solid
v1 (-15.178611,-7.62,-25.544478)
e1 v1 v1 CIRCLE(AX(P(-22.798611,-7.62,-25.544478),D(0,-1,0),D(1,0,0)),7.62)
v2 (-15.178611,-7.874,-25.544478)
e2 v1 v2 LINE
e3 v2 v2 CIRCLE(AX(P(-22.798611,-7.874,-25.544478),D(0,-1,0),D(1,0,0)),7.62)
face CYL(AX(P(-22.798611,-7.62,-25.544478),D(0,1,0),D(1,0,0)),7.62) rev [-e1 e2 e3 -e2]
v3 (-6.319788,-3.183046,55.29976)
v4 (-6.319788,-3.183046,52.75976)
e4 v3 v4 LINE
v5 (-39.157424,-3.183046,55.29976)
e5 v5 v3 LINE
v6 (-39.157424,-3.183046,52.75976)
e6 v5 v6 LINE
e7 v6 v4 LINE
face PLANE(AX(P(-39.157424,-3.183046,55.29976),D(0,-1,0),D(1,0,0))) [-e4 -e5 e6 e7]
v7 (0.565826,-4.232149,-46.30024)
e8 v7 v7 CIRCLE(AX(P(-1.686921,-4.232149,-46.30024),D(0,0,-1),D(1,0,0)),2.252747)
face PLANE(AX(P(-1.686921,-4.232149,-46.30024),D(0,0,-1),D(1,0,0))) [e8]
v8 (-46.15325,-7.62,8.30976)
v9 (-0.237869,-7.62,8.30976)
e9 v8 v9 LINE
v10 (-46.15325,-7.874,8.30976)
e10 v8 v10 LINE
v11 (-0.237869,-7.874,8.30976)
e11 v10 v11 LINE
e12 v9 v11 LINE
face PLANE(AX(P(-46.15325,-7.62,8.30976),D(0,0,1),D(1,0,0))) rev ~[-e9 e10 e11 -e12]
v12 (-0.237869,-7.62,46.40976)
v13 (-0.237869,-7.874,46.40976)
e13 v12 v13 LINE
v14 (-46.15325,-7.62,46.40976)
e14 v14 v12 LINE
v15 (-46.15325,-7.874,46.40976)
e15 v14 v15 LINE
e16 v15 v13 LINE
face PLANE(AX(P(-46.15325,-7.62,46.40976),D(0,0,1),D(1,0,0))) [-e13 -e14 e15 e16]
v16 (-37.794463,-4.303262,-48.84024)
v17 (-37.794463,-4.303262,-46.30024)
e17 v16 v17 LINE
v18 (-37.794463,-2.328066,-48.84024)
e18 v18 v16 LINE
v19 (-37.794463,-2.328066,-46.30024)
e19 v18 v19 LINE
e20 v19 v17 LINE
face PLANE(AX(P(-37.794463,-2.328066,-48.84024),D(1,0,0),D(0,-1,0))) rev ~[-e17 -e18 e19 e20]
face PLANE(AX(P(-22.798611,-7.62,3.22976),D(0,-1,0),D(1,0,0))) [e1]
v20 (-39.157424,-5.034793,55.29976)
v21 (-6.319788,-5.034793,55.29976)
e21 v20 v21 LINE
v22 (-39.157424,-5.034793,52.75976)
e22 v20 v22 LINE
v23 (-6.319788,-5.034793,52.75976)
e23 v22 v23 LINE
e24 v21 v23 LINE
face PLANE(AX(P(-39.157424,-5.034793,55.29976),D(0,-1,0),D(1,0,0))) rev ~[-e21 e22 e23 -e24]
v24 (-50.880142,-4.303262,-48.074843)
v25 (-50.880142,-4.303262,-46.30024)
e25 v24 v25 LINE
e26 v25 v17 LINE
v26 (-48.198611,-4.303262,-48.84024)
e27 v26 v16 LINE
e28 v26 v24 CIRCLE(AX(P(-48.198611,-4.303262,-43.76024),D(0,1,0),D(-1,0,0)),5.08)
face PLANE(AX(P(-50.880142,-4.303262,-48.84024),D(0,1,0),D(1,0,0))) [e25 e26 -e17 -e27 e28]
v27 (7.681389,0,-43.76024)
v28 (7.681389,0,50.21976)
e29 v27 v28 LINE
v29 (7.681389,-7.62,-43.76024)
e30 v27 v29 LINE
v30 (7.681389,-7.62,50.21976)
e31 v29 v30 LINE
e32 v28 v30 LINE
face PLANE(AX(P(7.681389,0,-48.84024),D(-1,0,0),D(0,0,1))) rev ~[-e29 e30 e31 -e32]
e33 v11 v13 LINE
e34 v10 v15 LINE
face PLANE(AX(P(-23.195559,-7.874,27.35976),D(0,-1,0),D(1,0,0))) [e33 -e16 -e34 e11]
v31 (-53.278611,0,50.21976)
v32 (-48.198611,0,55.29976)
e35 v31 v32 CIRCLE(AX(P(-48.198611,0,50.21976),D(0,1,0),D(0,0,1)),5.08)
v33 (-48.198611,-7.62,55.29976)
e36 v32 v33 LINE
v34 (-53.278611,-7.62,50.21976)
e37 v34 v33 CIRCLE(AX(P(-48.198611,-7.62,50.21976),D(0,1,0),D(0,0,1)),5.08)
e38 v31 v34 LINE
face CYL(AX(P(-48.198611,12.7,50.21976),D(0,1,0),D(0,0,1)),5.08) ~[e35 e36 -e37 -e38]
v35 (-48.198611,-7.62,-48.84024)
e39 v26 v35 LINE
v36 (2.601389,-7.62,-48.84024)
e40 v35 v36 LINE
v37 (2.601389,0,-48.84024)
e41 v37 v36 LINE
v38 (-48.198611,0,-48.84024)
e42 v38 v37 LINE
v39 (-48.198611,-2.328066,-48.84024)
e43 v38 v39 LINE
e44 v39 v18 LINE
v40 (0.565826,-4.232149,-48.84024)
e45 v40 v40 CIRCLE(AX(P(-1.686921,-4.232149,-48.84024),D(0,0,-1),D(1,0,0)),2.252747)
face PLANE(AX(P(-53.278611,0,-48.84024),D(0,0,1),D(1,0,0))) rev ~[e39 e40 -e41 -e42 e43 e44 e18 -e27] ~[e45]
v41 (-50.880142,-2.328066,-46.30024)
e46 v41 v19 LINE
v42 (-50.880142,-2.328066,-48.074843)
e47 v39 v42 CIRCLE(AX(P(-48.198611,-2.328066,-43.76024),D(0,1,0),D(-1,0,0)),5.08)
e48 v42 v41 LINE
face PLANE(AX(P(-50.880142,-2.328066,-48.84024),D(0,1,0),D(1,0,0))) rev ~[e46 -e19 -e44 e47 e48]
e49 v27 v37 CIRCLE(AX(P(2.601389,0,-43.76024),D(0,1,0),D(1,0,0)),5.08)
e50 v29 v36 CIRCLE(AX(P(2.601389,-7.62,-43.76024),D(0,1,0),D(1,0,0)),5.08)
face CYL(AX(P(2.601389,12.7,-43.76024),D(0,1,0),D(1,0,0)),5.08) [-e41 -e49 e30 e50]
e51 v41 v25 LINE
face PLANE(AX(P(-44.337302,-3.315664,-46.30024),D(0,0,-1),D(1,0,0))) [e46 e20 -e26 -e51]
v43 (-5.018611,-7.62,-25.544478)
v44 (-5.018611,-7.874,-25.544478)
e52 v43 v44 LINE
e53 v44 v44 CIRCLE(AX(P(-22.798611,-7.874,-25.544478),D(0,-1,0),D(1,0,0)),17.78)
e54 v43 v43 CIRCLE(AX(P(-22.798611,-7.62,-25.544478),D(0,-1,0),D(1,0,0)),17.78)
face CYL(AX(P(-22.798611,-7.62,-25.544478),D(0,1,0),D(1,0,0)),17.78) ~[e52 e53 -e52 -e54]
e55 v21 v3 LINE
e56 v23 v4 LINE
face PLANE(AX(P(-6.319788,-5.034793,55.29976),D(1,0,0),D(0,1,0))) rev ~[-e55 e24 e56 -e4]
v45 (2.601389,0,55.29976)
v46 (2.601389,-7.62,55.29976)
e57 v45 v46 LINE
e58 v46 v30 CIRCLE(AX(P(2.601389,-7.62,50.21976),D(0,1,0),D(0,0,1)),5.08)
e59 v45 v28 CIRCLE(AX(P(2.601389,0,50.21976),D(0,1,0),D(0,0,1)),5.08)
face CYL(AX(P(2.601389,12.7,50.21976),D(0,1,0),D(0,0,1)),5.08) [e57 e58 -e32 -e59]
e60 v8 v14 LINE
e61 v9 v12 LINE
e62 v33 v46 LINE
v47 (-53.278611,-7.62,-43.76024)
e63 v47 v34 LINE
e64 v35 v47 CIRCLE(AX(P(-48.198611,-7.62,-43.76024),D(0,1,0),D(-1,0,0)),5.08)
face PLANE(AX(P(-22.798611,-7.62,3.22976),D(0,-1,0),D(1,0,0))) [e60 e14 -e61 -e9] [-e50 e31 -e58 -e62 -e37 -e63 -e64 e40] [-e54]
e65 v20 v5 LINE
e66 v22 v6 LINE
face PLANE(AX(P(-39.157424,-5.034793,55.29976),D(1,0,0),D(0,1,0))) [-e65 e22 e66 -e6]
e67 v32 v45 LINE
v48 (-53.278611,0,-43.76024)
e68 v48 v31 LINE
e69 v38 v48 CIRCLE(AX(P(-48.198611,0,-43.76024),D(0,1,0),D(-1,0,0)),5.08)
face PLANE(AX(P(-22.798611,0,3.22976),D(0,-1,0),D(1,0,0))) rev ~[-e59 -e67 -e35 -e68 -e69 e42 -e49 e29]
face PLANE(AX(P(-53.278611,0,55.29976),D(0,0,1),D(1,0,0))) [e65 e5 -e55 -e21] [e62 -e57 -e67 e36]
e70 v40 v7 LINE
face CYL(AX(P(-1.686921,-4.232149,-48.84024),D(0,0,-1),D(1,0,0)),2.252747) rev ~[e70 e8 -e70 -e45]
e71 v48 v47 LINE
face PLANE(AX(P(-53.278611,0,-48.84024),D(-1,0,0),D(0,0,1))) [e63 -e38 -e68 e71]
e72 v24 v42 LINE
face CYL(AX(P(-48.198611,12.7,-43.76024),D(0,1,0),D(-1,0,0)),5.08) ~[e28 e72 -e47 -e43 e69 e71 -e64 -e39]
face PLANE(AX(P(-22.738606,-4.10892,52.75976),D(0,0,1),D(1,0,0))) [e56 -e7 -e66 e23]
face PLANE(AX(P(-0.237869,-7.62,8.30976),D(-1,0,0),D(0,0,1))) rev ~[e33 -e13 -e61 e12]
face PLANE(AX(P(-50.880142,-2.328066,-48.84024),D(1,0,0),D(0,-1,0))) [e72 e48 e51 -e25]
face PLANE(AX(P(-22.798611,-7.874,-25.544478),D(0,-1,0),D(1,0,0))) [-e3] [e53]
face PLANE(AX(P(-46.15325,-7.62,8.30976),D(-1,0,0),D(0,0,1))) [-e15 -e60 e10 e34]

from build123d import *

# Parameters (mm, degrees)
F0_W        = 60.96
F0_H        = 104.14
F1_DEPTH    = 7.62
F2_W        = 45.9153815961
F2_H        = 38.1
F2_R        = 17.78
F2_R_2      = 7.62
F3_DEPTH    = 0.254
F4_W        = 13.0856782198
F4_H        = 1.975195948
F5_DEPTH    = 2.54
F6_R        = 2.2527466913
F7_DEPTH    = 2.54
F8_T1_DEPTH = 33.02
F9_W        = 32.8376358375
F9_H        = 1.8517468125
F10_DEPTH   = 2.54


# Not quite as in the source:
# - a fillet or chamfer that OpenCascade refuses, or shapes differently, is made with other operations: its cross-section is extruded or revolved along the edge and cut away or added


with BuildPart() as f1:
    # F0 (on Front) → F1 (new body)
    with BuildSketch(Plane.XZ):
        with Locations((-22.7986111199, 3.2297596335)):
            Rectangle(F0_W, F0_H)
    extrude(amount=F1_DEPTH)

    # F2 (on face) → F3 (join)
    with BuildSketch(Plane.XZ.offset(7.62)):
        with Locations((-23.1955593918, 27.3597596335)):
            Rectangle(F2_W, F2_H)
        with Locations((-22.7986111199, -25.5444776267)):
            Circle(F2_R)
        with Locations((-22.7986111199, -25.5444776267)):
            Circle(F2_R_2, mode=Mode.SUBTRACT)
    extrude(amount=F3_DEPTH)

    # F4 (on face) → F5 (cut)
    with BuildSketch(Plane(origin=(0, 0, -48.8402403665), x_dir=(1, 0, 0), z_dir=(0, 0, -1))):
        with Locations((-44.3373024464, 3.3156641293)):
            Rectangle(F4_W, F4_H)
    extrude(amount=-F5_DEPTH, mode=Mode.SUBTRACT)

    # F6 (on face) → F7 (cut)
    with BuildSketch(Plane(origin=(0, 0, -48.8402403665), x_dir=(1, 0, 0), z_dir=(0, 0, -1))):
        with Locations((-1.6869211104, 4.2321491055)):
            Circle(F6_R)
    extrude(amount=-F7_DEPTH, mode=Mode.SUBTRACT)

    # F8: fillet of radius 5.08 on 4 edges, made by hand

    # F8_s2 → F8_t1 (cut)
    with BuildSketch(Plane.XZ.offset(-12.7)):
        with BuildLine():
            ThreePointArc((2.6013888801, 55.2997596335), (6.1934913285, 53.811862082), (7.6813888801, 50.2197596335))
            Line((7.6813888801, 50.2197596335), (7.6813888801, 55.2997596335))
            Line((7.6813888801, 55.2997596335), (2.6013888801, 55.2997596335))
        make_face()
        with BuildLine():
            ThreePointArc((-48.1986111199, 55.2997596335), (-51.7907135683, 53.811862082), (-53.2786111199, 50.2197596335))
            Line((-53.2786111199, 50.2197596335), (-53.2786111199, 55.2997596335))
            Line((-53.2786111199, 55.2997596335), (-48.1986111199, 55.2997596335))
        make_face()
        with BuildLine():
            ThreePointArc((7.6813888801, -43.7602403665), (6.1934913285, -47.3523428149), (2.6013888801, -48.8402403665))
            Line((2.6013888801, -48.8402403665), (7.6813888801, -48.8402403665))
            Line((7.6813888801, -48.8402403665), (7.6813888801, -43.7602403665))
        make_face()
        with BuildLine():
            ThreePointArc((-53.2786111199, -43.7602403665), (-51.7907135683, -47.3523428149), (-48.1986111199, -48.8402403665))
            Line((-48.1986111199, -48.8402403665), (-53.2786111199, -48.8402403665))
            Line((-53.2786111199, -48.8402403665), (-53.2786111199, -43.7602403665))
        make_face()
    extrude(amount=F8_T1_DEPTH, mode=Mode.SUBTRACT)

    # F9 (on face) → F10 (cut)
    with BuildSketch(Plane.XY.offset(55.2997596335)):
        with Locations((-22.7386062033, -4.1089197621)):
            Rectangle(F9_W, F9_H)
    extrude(amount=-F10_DEPTH, mode=Mode.SUBTRACT)


solid = f1.part
